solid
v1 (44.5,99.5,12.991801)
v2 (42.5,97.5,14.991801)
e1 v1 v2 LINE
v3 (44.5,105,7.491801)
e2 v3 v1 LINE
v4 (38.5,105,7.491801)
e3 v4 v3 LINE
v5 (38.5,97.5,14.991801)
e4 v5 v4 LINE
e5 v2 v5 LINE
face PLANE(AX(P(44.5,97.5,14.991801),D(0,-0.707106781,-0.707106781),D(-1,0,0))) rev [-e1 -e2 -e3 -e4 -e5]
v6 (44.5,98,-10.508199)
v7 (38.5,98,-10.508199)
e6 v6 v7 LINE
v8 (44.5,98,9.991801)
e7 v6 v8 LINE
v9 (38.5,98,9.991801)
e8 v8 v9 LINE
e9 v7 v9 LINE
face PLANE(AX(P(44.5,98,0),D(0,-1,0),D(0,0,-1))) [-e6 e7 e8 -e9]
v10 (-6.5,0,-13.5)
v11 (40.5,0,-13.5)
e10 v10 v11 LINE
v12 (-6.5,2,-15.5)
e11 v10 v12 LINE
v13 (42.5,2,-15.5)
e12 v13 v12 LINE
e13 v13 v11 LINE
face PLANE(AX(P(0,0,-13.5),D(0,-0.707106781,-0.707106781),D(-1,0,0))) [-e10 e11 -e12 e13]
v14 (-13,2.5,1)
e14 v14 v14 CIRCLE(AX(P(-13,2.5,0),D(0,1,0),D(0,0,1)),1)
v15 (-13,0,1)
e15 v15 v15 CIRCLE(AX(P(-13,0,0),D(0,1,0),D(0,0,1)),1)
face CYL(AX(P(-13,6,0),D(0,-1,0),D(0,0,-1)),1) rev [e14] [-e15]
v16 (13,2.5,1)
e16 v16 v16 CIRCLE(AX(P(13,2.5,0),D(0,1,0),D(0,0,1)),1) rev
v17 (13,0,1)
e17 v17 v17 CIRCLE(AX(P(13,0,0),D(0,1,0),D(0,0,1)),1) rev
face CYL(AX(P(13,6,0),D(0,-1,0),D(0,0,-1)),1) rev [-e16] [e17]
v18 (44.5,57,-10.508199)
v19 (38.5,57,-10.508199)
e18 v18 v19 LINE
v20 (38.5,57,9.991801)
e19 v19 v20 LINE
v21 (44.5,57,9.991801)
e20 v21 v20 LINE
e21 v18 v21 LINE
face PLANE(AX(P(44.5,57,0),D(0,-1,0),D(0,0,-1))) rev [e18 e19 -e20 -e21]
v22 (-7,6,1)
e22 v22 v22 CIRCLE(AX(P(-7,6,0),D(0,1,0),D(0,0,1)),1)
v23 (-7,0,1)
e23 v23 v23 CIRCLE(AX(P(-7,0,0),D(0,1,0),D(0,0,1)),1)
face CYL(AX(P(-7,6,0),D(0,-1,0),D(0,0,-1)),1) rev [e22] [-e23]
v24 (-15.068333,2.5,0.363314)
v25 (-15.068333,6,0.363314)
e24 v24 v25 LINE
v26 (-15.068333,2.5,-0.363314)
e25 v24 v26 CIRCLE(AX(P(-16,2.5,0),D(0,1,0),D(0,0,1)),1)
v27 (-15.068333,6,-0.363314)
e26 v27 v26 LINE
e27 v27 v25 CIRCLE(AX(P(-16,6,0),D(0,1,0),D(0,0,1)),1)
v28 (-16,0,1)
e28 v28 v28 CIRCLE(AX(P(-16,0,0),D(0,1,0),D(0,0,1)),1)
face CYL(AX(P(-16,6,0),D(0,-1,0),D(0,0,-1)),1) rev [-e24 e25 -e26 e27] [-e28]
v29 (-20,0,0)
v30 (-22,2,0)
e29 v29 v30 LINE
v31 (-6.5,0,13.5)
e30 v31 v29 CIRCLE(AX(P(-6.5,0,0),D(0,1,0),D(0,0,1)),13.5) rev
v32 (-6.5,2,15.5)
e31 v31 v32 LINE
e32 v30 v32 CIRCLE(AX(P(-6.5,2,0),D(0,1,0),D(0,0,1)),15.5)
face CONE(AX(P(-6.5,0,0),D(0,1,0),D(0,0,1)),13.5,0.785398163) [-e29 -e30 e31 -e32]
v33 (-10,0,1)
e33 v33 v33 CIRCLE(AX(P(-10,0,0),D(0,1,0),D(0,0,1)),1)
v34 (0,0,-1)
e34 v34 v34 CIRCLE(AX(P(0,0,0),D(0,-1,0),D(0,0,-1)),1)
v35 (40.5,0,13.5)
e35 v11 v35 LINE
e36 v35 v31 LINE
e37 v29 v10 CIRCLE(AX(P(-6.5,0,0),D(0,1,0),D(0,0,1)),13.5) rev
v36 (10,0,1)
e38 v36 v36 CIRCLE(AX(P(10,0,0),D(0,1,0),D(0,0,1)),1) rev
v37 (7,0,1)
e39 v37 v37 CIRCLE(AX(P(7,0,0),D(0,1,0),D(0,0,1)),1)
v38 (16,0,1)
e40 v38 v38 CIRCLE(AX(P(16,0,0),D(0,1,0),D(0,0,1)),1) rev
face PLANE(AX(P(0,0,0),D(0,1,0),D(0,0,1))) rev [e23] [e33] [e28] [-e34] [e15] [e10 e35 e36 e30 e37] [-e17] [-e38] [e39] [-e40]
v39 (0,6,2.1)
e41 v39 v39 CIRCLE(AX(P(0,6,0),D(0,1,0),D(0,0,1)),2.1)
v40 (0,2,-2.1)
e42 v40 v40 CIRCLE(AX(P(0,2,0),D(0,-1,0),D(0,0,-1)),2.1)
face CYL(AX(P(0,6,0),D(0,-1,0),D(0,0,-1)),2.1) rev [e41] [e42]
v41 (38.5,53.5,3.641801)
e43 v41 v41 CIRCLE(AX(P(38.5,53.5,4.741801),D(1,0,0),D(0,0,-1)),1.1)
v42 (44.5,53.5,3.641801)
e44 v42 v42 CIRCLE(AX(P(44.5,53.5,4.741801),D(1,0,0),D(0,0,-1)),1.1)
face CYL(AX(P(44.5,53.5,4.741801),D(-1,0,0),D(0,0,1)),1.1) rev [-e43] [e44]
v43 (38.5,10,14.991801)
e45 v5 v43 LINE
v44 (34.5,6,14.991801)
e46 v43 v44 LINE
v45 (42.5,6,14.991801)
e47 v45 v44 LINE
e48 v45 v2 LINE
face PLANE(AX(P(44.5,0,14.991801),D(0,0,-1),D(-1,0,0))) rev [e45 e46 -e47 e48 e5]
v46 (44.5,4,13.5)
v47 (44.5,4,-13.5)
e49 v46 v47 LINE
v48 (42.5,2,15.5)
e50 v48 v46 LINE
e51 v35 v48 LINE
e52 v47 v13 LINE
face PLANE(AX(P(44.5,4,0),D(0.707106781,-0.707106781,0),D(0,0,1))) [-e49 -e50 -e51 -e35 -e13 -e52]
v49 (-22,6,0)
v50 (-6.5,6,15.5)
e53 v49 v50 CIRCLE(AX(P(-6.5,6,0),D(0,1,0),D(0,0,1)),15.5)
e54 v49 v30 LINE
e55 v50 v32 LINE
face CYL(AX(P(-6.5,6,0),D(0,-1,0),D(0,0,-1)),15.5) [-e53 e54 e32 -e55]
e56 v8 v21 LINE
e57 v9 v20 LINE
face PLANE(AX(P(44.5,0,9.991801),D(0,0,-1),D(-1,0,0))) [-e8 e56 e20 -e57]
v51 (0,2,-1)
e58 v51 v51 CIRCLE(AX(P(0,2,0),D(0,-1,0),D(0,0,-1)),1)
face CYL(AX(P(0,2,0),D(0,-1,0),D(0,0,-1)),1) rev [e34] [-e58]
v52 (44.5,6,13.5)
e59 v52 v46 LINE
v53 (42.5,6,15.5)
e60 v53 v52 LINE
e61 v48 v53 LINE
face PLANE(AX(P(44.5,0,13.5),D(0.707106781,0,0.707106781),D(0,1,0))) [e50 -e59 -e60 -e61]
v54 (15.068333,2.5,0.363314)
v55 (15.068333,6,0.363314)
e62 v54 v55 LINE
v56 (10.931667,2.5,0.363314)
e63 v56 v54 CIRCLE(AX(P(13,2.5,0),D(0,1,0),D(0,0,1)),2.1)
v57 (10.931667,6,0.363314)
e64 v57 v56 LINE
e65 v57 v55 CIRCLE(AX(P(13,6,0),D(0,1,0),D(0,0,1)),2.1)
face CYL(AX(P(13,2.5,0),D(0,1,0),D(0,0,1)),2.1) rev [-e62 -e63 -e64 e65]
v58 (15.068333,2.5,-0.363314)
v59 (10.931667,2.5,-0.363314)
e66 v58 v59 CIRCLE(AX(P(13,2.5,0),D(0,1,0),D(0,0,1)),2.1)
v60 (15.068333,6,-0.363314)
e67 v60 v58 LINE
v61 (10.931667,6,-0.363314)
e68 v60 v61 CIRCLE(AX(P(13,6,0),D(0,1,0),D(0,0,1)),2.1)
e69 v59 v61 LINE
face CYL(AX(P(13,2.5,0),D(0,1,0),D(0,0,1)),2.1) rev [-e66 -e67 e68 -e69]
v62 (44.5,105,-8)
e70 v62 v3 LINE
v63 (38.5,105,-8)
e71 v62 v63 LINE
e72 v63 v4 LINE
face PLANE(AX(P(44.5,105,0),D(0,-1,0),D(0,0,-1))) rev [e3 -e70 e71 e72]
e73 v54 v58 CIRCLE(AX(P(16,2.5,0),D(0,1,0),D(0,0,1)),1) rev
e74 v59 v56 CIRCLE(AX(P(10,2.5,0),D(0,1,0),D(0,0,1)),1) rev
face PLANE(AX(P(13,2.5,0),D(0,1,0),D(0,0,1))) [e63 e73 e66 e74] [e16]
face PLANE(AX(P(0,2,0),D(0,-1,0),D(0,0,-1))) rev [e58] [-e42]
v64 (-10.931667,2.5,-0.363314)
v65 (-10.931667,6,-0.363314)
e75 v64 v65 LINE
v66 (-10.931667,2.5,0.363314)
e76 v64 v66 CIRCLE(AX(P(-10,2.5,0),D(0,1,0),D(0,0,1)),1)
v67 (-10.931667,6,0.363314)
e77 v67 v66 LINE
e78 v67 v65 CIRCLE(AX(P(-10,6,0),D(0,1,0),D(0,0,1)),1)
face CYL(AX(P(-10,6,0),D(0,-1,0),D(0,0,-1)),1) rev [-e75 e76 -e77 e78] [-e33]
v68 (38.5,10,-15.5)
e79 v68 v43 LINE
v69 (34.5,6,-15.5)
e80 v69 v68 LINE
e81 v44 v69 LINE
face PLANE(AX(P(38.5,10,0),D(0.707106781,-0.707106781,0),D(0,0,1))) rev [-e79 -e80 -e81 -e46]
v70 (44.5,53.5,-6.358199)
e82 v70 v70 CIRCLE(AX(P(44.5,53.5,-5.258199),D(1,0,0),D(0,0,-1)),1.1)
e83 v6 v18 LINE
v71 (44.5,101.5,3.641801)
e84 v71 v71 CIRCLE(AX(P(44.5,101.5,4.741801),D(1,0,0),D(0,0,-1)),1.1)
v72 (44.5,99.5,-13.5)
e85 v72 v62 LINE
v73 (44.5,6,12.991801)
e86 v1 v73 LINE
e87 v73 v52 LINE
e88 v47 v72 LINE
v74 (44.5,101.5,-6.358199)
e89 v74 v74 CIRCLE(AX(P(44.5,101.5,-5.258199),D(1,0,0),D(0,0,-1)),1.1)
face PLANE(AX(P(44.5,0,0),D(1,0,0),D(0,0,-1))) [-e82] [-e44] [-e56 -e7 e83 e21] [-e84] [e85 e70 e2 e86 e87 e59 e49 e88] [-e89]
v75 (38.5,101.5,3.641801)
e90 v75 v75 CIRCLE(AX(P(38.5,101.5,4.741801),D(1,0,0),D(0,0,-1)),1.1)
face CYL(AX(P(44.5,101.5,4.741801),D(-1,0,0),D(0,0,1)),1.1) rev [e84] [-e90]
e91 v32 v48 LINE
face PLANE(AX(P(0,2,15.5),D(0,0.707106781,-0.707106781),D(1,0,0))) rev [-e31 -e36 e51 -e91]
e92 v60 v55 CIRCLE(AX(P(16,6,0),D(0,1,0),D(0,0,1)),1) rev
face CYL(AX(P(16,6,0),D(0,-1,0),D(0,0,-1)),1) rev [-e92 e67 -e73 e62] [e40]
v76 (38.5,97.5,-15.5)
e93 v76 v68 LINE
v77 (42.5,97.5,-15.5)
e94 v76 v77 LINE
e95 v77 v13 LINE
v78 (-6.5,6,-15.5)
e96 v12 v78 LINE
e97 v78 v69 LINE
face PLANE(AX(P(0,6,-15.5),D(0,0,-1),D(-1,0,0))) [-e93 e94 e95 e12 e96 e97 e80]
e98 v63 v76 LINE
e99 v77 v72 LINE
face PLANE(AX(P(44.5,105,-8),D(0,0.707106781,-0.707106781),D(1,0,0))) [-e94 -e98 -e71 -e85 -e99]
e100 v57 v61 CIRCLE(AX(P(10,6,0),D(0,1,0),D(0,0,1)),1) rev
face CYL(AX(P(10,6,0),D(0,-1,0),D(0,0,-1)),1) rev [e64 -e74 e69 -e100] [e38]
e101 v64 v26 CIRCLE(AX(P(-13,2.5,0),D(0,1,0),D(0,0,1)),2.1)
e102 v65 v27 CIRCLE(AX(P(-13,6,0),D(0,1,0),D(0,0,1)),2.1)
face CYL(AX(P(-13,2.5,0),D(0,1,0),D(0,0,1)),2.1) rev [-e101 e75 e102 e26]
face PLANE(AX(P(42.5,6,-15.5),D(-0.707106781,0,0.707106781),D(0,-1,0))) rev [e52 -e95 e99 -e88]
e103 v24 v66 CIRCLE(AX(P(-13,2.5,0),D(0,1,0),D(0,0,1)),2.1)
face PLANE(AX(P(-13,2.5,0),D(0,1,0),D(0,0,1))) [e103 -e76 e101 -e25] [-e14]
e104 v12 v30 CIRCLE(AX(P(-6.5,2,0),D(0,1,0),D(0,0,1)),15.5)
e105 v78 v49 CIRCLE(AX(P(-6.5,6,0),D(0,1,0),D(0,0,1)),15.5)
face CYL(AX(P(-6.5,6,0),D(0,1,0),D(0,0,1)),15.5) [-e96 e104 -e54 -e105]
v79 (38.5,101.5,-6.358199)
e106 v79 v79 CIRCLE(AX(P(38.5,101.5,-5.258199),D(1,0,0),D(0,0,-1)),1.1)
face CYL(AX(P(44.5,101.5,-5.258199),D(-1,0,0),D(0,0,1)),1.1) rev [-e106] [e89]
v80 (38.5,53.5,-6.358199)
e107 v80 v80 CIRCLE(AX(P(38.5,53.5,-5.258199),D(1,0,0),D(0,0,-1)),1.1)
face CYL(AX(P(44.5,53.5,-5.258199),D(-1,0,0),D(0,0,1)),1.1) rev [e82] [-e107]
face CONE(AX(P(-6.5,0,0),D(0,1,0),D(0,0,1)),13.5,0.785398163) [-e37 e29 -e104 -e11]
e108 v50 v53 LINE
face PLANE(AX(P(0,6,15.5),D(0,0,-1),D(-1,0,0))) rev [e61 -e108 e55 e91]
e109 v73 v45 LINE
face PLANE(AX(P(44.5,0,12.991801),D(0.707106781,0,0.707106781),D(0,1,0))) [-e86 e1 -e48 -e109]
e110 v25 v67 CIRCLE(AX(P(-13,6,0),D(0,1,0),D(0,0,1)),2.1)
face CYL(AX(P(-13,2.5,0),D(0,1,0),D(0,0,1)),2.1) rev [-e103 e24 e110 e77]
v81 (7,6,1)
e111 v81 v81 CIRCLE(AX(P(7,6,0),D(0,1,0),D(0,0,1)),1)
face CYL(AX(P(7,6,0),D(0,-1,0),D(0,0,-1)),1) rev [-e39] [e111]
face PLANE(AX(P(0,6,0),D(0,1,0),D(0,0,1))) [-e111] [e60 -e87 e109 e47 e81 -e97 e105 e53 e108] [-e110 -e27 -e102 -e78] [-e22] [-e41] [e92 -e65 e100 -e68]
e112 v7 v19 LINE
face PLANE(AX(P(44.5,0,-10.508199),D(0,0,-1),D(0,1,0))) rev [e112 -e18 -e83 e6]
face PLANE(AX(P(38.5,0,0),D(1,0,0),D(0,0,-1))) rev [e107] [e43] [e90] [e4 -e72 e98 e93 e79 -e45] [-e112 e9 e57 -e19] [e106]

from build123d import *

# Parameters (mm, degrees)
CROQUIS1_W              = 44
CROQUIS1_H              = 31
CROQUIS1_R              = 1
CROQUIS1_R_2            = 2.1
SALIENTE_EXTRUIR1_DEPTH = 6
CROQUIS2_W              = 31
CROQUIS2_H              = 6
SALIENTE_EXTRUIR2_DEPTH = 16.5
CROQUIS3_R              = 1.1
CROQUIS3_W              = 20.5
CROQUIS3_H              = 41
SALIENTE_EXTRUIR3_DEPTH = 6
CROQUIS4_R              = 2.1
CROQUIS4_R_2            = 1
SALIENTE_EXTRUIR4_DEPTH = 2
CROQUIS5_R              = 2.1
CORTAR_EXTRUIR1_DEPTH   = 3.5
REDONDEO1_R             = 15.5
CHAFL_N1_SIZE           = 2
CHAFL_N2_SIZE           = 2
CHAFL_N3_SIZE           = 4
CHAFL_N4_SIZE           = 4
CHAFL_N5_SIZE           = 7.5


with BuildPart() as part:
    # Croquis1 → Saliente-Extruir1 (new body)
    with BuildSketch(Plane(origin=(0, 0, 0), x_dir=(1, 0, 0), z_dir=(0, 1, 0))):
        Rectangle(CROQUIS1_W, CROQUIS1_H)
        with Locations(Location((13, 0, 0), (0, 0, 270))):
            Circle(CROQUIS1_R, mode=Mode.SUBTRACT)
        with Locations(Location((0, 0, 0), (0, 0, 270))):
            Circle(CROQUIS1_R_2, mode=Mode.SUBTRACT)
        with Locations(Location((7, 0, 0), (0, 0, 270))):
            Circle(CROQUIS1_R, mode=Mode.SUBTRACT)
        with Locations(Location((-7, 0, 0), (0, 0, 270))):
            Circle(CROQUIS1_R, mode=Mode.SUBTRACT)
        with Locations(Location((-10, 0, 0), (0, 0, 270))):
            Circle(CROQUIS1_R, mode=Mode.SUBTRACT)
        with Locations(Location((-13, 0, 0), (0, 0, 270))):
            Circle(CROQUIS1_R, mode=Mode.SUBTRACT)
        with Locations(Location((-16, 0, 0), (0, 0, 270))):
            Circle(CROQUIS1_R, mode=Mode.SUBTRACT)
        with Locations(Location((10, 0, 0), (0, 0, 270))):
            Circle(CROQUIS1_R, mode=Mode.SUBTRACT)
        with Locations(Location((16, 0, 0), (0, 0, 270))):
            Circle(CROQUIS1_R, mode=Mode.SUBTRACT)
    extrude(amount=SALIENTE_EXTRUIR1_DEPTH)

    # Croquis2 → Saliente-Extruir2 (add)
    with BuildSketch(Plane(origin=(22, 0, 0), x_dir=(0, 0, -1), z_dir=(1, 0, 0))):
        with Locations((0, 3)):
            Rectangle(CROQUIS2_W, CROQUIS2_H)
    extrude(amount=SALIENTE_EXTRUIR2_DEPTH)

    # Croquis3 → Saliente-Extruir3 (add)
    with BuildSketch(Plane(origin=(38.5, 0, 0), x_dir=(0, 0, -1), z_dir=(1, 0, 0))):
        Polygon((15.5, 105), (-14.991801075, 105), (-14.991801075, 6), (-15.5, 6), (-15.5, 0), (15.5, 0), align=None)
        with Locations((-4.741801075, 53.5)):
            Circle(CROQUIS3_R, mode=Mode.SUBTRACT)
        with Locations((-4.741801075, 101.5)):
            Circle(CROQUIS3_R, mode=Mode.SUBTRACT)
        with Locations((5.258198925, 53.5)):
            Circle(CROQUIS3_R, mode=Mode.SUBTRACT)
        with Locations((0.258198925, 77.5)):
            Rectangle(CROQUIS3_W, CROQUIS3_H, mode=Mode.SUBTRACT)
        with Locations((5.258198925, 101.5)):
            Circle(CROQUIS3_R, mode=Mode.SUBTRACT)
    extrude(amount=SALIENTE_EXTRUIR3_DEPTH)

    # Croquis4 → Saliente-Extruir4 (add)
    with BuildSketch(Plane.XZ):
        with Locations(Location((0, 0, 0), (0, 0, 270))):
            Circle(CROQUIS4_R)
        with Locations(Location((0, 0, 0), (0, 0, 270))):
            Circle(CROQUIS4_R_2, mode=Mode.SUBTRACT)
    extrude(amount=-SALIENTE_EXTRUIR4_DEPTH)

    # Croquis5 → Cortar-Extruir1 (cut)
    with BuildSketch(Plane(origin=(0, 6, 0), x_dir=(1, 0, 0), z_dir=(0, 1, 0))):
        with Locations((-13, 0)):
            Circle(CROQUIS5_R)
        with Locations((13, 0)):
            Circle(CROQUIS5_R)
    extrude(amount=-CORTAR_EXTRUIR1_DEPTH, mode=Mode.SUBTRACT)

    # Redondeo1
    redondeo1_edges = [part.edges().sort_by_distance(p)[0] for p in [
        (-22, 3, 15.5),
        (-22, 3, -15.5),
    ]]
    fillet(redondeo1_edges, radius=REDONDEO1_R - 0.0001)  # a hair under: the kernel refuses the full size

    # Chaflán1
    chafl_n1_edges = [part.edges().sort_by_distance(p)[0] for p in [
        (18.99995, 0, 15.5),
        (18.99995, 0, -15.5),
        (-17.460184398, 0, -10.960184398),
        (-17.460184398, 0, 10.960184398),
        (44.5, 52.5, -15.5),
        (44.5, 55.5, 14.991801075),
    ]]
    chamfer(chafl_n1_edges, length=CHAFL_N1_SIZE)

    # Chaflán2
    chafl_n2_edges = [part.edges().sort_by_distance(p)[0] for p in [
        (44.5, 4, 15.5),
    ]]
    chamfer(chafl_n2_edges, length=CHAFL_N2_SIZE)

    # Chaflán3
    chafl_n3_edges = [part.edges().sort_by_distance(p)[0] for p in [
        (44.5, 0, 0),
    ]]
    chamfer(chafl_n3_edges, length=CHAFL_N3_SIZE - 0.0001)  # a hair under: the kernel refuses the full size

    # Chaflán4
    chafl_n4_edges = [part.edges().sort_by_distance(p)[0] for p in [
        (38.5, 6, -0.254099463),
    ]]
    chamfer(chafl_n4_edges, length=CHAFL_N4_SIZE)

    # Chaflán5
    chafl_n5_edges = [part.edges().sort_by_distance(p)[0] for p in [
        (40.5, 105, 14.991801075),
        (40.5, 105, -15.5),
    ]]
    chamfer(chafl_n5_edges, length=CHAFL_N5_SIZE)


solid = part.part
